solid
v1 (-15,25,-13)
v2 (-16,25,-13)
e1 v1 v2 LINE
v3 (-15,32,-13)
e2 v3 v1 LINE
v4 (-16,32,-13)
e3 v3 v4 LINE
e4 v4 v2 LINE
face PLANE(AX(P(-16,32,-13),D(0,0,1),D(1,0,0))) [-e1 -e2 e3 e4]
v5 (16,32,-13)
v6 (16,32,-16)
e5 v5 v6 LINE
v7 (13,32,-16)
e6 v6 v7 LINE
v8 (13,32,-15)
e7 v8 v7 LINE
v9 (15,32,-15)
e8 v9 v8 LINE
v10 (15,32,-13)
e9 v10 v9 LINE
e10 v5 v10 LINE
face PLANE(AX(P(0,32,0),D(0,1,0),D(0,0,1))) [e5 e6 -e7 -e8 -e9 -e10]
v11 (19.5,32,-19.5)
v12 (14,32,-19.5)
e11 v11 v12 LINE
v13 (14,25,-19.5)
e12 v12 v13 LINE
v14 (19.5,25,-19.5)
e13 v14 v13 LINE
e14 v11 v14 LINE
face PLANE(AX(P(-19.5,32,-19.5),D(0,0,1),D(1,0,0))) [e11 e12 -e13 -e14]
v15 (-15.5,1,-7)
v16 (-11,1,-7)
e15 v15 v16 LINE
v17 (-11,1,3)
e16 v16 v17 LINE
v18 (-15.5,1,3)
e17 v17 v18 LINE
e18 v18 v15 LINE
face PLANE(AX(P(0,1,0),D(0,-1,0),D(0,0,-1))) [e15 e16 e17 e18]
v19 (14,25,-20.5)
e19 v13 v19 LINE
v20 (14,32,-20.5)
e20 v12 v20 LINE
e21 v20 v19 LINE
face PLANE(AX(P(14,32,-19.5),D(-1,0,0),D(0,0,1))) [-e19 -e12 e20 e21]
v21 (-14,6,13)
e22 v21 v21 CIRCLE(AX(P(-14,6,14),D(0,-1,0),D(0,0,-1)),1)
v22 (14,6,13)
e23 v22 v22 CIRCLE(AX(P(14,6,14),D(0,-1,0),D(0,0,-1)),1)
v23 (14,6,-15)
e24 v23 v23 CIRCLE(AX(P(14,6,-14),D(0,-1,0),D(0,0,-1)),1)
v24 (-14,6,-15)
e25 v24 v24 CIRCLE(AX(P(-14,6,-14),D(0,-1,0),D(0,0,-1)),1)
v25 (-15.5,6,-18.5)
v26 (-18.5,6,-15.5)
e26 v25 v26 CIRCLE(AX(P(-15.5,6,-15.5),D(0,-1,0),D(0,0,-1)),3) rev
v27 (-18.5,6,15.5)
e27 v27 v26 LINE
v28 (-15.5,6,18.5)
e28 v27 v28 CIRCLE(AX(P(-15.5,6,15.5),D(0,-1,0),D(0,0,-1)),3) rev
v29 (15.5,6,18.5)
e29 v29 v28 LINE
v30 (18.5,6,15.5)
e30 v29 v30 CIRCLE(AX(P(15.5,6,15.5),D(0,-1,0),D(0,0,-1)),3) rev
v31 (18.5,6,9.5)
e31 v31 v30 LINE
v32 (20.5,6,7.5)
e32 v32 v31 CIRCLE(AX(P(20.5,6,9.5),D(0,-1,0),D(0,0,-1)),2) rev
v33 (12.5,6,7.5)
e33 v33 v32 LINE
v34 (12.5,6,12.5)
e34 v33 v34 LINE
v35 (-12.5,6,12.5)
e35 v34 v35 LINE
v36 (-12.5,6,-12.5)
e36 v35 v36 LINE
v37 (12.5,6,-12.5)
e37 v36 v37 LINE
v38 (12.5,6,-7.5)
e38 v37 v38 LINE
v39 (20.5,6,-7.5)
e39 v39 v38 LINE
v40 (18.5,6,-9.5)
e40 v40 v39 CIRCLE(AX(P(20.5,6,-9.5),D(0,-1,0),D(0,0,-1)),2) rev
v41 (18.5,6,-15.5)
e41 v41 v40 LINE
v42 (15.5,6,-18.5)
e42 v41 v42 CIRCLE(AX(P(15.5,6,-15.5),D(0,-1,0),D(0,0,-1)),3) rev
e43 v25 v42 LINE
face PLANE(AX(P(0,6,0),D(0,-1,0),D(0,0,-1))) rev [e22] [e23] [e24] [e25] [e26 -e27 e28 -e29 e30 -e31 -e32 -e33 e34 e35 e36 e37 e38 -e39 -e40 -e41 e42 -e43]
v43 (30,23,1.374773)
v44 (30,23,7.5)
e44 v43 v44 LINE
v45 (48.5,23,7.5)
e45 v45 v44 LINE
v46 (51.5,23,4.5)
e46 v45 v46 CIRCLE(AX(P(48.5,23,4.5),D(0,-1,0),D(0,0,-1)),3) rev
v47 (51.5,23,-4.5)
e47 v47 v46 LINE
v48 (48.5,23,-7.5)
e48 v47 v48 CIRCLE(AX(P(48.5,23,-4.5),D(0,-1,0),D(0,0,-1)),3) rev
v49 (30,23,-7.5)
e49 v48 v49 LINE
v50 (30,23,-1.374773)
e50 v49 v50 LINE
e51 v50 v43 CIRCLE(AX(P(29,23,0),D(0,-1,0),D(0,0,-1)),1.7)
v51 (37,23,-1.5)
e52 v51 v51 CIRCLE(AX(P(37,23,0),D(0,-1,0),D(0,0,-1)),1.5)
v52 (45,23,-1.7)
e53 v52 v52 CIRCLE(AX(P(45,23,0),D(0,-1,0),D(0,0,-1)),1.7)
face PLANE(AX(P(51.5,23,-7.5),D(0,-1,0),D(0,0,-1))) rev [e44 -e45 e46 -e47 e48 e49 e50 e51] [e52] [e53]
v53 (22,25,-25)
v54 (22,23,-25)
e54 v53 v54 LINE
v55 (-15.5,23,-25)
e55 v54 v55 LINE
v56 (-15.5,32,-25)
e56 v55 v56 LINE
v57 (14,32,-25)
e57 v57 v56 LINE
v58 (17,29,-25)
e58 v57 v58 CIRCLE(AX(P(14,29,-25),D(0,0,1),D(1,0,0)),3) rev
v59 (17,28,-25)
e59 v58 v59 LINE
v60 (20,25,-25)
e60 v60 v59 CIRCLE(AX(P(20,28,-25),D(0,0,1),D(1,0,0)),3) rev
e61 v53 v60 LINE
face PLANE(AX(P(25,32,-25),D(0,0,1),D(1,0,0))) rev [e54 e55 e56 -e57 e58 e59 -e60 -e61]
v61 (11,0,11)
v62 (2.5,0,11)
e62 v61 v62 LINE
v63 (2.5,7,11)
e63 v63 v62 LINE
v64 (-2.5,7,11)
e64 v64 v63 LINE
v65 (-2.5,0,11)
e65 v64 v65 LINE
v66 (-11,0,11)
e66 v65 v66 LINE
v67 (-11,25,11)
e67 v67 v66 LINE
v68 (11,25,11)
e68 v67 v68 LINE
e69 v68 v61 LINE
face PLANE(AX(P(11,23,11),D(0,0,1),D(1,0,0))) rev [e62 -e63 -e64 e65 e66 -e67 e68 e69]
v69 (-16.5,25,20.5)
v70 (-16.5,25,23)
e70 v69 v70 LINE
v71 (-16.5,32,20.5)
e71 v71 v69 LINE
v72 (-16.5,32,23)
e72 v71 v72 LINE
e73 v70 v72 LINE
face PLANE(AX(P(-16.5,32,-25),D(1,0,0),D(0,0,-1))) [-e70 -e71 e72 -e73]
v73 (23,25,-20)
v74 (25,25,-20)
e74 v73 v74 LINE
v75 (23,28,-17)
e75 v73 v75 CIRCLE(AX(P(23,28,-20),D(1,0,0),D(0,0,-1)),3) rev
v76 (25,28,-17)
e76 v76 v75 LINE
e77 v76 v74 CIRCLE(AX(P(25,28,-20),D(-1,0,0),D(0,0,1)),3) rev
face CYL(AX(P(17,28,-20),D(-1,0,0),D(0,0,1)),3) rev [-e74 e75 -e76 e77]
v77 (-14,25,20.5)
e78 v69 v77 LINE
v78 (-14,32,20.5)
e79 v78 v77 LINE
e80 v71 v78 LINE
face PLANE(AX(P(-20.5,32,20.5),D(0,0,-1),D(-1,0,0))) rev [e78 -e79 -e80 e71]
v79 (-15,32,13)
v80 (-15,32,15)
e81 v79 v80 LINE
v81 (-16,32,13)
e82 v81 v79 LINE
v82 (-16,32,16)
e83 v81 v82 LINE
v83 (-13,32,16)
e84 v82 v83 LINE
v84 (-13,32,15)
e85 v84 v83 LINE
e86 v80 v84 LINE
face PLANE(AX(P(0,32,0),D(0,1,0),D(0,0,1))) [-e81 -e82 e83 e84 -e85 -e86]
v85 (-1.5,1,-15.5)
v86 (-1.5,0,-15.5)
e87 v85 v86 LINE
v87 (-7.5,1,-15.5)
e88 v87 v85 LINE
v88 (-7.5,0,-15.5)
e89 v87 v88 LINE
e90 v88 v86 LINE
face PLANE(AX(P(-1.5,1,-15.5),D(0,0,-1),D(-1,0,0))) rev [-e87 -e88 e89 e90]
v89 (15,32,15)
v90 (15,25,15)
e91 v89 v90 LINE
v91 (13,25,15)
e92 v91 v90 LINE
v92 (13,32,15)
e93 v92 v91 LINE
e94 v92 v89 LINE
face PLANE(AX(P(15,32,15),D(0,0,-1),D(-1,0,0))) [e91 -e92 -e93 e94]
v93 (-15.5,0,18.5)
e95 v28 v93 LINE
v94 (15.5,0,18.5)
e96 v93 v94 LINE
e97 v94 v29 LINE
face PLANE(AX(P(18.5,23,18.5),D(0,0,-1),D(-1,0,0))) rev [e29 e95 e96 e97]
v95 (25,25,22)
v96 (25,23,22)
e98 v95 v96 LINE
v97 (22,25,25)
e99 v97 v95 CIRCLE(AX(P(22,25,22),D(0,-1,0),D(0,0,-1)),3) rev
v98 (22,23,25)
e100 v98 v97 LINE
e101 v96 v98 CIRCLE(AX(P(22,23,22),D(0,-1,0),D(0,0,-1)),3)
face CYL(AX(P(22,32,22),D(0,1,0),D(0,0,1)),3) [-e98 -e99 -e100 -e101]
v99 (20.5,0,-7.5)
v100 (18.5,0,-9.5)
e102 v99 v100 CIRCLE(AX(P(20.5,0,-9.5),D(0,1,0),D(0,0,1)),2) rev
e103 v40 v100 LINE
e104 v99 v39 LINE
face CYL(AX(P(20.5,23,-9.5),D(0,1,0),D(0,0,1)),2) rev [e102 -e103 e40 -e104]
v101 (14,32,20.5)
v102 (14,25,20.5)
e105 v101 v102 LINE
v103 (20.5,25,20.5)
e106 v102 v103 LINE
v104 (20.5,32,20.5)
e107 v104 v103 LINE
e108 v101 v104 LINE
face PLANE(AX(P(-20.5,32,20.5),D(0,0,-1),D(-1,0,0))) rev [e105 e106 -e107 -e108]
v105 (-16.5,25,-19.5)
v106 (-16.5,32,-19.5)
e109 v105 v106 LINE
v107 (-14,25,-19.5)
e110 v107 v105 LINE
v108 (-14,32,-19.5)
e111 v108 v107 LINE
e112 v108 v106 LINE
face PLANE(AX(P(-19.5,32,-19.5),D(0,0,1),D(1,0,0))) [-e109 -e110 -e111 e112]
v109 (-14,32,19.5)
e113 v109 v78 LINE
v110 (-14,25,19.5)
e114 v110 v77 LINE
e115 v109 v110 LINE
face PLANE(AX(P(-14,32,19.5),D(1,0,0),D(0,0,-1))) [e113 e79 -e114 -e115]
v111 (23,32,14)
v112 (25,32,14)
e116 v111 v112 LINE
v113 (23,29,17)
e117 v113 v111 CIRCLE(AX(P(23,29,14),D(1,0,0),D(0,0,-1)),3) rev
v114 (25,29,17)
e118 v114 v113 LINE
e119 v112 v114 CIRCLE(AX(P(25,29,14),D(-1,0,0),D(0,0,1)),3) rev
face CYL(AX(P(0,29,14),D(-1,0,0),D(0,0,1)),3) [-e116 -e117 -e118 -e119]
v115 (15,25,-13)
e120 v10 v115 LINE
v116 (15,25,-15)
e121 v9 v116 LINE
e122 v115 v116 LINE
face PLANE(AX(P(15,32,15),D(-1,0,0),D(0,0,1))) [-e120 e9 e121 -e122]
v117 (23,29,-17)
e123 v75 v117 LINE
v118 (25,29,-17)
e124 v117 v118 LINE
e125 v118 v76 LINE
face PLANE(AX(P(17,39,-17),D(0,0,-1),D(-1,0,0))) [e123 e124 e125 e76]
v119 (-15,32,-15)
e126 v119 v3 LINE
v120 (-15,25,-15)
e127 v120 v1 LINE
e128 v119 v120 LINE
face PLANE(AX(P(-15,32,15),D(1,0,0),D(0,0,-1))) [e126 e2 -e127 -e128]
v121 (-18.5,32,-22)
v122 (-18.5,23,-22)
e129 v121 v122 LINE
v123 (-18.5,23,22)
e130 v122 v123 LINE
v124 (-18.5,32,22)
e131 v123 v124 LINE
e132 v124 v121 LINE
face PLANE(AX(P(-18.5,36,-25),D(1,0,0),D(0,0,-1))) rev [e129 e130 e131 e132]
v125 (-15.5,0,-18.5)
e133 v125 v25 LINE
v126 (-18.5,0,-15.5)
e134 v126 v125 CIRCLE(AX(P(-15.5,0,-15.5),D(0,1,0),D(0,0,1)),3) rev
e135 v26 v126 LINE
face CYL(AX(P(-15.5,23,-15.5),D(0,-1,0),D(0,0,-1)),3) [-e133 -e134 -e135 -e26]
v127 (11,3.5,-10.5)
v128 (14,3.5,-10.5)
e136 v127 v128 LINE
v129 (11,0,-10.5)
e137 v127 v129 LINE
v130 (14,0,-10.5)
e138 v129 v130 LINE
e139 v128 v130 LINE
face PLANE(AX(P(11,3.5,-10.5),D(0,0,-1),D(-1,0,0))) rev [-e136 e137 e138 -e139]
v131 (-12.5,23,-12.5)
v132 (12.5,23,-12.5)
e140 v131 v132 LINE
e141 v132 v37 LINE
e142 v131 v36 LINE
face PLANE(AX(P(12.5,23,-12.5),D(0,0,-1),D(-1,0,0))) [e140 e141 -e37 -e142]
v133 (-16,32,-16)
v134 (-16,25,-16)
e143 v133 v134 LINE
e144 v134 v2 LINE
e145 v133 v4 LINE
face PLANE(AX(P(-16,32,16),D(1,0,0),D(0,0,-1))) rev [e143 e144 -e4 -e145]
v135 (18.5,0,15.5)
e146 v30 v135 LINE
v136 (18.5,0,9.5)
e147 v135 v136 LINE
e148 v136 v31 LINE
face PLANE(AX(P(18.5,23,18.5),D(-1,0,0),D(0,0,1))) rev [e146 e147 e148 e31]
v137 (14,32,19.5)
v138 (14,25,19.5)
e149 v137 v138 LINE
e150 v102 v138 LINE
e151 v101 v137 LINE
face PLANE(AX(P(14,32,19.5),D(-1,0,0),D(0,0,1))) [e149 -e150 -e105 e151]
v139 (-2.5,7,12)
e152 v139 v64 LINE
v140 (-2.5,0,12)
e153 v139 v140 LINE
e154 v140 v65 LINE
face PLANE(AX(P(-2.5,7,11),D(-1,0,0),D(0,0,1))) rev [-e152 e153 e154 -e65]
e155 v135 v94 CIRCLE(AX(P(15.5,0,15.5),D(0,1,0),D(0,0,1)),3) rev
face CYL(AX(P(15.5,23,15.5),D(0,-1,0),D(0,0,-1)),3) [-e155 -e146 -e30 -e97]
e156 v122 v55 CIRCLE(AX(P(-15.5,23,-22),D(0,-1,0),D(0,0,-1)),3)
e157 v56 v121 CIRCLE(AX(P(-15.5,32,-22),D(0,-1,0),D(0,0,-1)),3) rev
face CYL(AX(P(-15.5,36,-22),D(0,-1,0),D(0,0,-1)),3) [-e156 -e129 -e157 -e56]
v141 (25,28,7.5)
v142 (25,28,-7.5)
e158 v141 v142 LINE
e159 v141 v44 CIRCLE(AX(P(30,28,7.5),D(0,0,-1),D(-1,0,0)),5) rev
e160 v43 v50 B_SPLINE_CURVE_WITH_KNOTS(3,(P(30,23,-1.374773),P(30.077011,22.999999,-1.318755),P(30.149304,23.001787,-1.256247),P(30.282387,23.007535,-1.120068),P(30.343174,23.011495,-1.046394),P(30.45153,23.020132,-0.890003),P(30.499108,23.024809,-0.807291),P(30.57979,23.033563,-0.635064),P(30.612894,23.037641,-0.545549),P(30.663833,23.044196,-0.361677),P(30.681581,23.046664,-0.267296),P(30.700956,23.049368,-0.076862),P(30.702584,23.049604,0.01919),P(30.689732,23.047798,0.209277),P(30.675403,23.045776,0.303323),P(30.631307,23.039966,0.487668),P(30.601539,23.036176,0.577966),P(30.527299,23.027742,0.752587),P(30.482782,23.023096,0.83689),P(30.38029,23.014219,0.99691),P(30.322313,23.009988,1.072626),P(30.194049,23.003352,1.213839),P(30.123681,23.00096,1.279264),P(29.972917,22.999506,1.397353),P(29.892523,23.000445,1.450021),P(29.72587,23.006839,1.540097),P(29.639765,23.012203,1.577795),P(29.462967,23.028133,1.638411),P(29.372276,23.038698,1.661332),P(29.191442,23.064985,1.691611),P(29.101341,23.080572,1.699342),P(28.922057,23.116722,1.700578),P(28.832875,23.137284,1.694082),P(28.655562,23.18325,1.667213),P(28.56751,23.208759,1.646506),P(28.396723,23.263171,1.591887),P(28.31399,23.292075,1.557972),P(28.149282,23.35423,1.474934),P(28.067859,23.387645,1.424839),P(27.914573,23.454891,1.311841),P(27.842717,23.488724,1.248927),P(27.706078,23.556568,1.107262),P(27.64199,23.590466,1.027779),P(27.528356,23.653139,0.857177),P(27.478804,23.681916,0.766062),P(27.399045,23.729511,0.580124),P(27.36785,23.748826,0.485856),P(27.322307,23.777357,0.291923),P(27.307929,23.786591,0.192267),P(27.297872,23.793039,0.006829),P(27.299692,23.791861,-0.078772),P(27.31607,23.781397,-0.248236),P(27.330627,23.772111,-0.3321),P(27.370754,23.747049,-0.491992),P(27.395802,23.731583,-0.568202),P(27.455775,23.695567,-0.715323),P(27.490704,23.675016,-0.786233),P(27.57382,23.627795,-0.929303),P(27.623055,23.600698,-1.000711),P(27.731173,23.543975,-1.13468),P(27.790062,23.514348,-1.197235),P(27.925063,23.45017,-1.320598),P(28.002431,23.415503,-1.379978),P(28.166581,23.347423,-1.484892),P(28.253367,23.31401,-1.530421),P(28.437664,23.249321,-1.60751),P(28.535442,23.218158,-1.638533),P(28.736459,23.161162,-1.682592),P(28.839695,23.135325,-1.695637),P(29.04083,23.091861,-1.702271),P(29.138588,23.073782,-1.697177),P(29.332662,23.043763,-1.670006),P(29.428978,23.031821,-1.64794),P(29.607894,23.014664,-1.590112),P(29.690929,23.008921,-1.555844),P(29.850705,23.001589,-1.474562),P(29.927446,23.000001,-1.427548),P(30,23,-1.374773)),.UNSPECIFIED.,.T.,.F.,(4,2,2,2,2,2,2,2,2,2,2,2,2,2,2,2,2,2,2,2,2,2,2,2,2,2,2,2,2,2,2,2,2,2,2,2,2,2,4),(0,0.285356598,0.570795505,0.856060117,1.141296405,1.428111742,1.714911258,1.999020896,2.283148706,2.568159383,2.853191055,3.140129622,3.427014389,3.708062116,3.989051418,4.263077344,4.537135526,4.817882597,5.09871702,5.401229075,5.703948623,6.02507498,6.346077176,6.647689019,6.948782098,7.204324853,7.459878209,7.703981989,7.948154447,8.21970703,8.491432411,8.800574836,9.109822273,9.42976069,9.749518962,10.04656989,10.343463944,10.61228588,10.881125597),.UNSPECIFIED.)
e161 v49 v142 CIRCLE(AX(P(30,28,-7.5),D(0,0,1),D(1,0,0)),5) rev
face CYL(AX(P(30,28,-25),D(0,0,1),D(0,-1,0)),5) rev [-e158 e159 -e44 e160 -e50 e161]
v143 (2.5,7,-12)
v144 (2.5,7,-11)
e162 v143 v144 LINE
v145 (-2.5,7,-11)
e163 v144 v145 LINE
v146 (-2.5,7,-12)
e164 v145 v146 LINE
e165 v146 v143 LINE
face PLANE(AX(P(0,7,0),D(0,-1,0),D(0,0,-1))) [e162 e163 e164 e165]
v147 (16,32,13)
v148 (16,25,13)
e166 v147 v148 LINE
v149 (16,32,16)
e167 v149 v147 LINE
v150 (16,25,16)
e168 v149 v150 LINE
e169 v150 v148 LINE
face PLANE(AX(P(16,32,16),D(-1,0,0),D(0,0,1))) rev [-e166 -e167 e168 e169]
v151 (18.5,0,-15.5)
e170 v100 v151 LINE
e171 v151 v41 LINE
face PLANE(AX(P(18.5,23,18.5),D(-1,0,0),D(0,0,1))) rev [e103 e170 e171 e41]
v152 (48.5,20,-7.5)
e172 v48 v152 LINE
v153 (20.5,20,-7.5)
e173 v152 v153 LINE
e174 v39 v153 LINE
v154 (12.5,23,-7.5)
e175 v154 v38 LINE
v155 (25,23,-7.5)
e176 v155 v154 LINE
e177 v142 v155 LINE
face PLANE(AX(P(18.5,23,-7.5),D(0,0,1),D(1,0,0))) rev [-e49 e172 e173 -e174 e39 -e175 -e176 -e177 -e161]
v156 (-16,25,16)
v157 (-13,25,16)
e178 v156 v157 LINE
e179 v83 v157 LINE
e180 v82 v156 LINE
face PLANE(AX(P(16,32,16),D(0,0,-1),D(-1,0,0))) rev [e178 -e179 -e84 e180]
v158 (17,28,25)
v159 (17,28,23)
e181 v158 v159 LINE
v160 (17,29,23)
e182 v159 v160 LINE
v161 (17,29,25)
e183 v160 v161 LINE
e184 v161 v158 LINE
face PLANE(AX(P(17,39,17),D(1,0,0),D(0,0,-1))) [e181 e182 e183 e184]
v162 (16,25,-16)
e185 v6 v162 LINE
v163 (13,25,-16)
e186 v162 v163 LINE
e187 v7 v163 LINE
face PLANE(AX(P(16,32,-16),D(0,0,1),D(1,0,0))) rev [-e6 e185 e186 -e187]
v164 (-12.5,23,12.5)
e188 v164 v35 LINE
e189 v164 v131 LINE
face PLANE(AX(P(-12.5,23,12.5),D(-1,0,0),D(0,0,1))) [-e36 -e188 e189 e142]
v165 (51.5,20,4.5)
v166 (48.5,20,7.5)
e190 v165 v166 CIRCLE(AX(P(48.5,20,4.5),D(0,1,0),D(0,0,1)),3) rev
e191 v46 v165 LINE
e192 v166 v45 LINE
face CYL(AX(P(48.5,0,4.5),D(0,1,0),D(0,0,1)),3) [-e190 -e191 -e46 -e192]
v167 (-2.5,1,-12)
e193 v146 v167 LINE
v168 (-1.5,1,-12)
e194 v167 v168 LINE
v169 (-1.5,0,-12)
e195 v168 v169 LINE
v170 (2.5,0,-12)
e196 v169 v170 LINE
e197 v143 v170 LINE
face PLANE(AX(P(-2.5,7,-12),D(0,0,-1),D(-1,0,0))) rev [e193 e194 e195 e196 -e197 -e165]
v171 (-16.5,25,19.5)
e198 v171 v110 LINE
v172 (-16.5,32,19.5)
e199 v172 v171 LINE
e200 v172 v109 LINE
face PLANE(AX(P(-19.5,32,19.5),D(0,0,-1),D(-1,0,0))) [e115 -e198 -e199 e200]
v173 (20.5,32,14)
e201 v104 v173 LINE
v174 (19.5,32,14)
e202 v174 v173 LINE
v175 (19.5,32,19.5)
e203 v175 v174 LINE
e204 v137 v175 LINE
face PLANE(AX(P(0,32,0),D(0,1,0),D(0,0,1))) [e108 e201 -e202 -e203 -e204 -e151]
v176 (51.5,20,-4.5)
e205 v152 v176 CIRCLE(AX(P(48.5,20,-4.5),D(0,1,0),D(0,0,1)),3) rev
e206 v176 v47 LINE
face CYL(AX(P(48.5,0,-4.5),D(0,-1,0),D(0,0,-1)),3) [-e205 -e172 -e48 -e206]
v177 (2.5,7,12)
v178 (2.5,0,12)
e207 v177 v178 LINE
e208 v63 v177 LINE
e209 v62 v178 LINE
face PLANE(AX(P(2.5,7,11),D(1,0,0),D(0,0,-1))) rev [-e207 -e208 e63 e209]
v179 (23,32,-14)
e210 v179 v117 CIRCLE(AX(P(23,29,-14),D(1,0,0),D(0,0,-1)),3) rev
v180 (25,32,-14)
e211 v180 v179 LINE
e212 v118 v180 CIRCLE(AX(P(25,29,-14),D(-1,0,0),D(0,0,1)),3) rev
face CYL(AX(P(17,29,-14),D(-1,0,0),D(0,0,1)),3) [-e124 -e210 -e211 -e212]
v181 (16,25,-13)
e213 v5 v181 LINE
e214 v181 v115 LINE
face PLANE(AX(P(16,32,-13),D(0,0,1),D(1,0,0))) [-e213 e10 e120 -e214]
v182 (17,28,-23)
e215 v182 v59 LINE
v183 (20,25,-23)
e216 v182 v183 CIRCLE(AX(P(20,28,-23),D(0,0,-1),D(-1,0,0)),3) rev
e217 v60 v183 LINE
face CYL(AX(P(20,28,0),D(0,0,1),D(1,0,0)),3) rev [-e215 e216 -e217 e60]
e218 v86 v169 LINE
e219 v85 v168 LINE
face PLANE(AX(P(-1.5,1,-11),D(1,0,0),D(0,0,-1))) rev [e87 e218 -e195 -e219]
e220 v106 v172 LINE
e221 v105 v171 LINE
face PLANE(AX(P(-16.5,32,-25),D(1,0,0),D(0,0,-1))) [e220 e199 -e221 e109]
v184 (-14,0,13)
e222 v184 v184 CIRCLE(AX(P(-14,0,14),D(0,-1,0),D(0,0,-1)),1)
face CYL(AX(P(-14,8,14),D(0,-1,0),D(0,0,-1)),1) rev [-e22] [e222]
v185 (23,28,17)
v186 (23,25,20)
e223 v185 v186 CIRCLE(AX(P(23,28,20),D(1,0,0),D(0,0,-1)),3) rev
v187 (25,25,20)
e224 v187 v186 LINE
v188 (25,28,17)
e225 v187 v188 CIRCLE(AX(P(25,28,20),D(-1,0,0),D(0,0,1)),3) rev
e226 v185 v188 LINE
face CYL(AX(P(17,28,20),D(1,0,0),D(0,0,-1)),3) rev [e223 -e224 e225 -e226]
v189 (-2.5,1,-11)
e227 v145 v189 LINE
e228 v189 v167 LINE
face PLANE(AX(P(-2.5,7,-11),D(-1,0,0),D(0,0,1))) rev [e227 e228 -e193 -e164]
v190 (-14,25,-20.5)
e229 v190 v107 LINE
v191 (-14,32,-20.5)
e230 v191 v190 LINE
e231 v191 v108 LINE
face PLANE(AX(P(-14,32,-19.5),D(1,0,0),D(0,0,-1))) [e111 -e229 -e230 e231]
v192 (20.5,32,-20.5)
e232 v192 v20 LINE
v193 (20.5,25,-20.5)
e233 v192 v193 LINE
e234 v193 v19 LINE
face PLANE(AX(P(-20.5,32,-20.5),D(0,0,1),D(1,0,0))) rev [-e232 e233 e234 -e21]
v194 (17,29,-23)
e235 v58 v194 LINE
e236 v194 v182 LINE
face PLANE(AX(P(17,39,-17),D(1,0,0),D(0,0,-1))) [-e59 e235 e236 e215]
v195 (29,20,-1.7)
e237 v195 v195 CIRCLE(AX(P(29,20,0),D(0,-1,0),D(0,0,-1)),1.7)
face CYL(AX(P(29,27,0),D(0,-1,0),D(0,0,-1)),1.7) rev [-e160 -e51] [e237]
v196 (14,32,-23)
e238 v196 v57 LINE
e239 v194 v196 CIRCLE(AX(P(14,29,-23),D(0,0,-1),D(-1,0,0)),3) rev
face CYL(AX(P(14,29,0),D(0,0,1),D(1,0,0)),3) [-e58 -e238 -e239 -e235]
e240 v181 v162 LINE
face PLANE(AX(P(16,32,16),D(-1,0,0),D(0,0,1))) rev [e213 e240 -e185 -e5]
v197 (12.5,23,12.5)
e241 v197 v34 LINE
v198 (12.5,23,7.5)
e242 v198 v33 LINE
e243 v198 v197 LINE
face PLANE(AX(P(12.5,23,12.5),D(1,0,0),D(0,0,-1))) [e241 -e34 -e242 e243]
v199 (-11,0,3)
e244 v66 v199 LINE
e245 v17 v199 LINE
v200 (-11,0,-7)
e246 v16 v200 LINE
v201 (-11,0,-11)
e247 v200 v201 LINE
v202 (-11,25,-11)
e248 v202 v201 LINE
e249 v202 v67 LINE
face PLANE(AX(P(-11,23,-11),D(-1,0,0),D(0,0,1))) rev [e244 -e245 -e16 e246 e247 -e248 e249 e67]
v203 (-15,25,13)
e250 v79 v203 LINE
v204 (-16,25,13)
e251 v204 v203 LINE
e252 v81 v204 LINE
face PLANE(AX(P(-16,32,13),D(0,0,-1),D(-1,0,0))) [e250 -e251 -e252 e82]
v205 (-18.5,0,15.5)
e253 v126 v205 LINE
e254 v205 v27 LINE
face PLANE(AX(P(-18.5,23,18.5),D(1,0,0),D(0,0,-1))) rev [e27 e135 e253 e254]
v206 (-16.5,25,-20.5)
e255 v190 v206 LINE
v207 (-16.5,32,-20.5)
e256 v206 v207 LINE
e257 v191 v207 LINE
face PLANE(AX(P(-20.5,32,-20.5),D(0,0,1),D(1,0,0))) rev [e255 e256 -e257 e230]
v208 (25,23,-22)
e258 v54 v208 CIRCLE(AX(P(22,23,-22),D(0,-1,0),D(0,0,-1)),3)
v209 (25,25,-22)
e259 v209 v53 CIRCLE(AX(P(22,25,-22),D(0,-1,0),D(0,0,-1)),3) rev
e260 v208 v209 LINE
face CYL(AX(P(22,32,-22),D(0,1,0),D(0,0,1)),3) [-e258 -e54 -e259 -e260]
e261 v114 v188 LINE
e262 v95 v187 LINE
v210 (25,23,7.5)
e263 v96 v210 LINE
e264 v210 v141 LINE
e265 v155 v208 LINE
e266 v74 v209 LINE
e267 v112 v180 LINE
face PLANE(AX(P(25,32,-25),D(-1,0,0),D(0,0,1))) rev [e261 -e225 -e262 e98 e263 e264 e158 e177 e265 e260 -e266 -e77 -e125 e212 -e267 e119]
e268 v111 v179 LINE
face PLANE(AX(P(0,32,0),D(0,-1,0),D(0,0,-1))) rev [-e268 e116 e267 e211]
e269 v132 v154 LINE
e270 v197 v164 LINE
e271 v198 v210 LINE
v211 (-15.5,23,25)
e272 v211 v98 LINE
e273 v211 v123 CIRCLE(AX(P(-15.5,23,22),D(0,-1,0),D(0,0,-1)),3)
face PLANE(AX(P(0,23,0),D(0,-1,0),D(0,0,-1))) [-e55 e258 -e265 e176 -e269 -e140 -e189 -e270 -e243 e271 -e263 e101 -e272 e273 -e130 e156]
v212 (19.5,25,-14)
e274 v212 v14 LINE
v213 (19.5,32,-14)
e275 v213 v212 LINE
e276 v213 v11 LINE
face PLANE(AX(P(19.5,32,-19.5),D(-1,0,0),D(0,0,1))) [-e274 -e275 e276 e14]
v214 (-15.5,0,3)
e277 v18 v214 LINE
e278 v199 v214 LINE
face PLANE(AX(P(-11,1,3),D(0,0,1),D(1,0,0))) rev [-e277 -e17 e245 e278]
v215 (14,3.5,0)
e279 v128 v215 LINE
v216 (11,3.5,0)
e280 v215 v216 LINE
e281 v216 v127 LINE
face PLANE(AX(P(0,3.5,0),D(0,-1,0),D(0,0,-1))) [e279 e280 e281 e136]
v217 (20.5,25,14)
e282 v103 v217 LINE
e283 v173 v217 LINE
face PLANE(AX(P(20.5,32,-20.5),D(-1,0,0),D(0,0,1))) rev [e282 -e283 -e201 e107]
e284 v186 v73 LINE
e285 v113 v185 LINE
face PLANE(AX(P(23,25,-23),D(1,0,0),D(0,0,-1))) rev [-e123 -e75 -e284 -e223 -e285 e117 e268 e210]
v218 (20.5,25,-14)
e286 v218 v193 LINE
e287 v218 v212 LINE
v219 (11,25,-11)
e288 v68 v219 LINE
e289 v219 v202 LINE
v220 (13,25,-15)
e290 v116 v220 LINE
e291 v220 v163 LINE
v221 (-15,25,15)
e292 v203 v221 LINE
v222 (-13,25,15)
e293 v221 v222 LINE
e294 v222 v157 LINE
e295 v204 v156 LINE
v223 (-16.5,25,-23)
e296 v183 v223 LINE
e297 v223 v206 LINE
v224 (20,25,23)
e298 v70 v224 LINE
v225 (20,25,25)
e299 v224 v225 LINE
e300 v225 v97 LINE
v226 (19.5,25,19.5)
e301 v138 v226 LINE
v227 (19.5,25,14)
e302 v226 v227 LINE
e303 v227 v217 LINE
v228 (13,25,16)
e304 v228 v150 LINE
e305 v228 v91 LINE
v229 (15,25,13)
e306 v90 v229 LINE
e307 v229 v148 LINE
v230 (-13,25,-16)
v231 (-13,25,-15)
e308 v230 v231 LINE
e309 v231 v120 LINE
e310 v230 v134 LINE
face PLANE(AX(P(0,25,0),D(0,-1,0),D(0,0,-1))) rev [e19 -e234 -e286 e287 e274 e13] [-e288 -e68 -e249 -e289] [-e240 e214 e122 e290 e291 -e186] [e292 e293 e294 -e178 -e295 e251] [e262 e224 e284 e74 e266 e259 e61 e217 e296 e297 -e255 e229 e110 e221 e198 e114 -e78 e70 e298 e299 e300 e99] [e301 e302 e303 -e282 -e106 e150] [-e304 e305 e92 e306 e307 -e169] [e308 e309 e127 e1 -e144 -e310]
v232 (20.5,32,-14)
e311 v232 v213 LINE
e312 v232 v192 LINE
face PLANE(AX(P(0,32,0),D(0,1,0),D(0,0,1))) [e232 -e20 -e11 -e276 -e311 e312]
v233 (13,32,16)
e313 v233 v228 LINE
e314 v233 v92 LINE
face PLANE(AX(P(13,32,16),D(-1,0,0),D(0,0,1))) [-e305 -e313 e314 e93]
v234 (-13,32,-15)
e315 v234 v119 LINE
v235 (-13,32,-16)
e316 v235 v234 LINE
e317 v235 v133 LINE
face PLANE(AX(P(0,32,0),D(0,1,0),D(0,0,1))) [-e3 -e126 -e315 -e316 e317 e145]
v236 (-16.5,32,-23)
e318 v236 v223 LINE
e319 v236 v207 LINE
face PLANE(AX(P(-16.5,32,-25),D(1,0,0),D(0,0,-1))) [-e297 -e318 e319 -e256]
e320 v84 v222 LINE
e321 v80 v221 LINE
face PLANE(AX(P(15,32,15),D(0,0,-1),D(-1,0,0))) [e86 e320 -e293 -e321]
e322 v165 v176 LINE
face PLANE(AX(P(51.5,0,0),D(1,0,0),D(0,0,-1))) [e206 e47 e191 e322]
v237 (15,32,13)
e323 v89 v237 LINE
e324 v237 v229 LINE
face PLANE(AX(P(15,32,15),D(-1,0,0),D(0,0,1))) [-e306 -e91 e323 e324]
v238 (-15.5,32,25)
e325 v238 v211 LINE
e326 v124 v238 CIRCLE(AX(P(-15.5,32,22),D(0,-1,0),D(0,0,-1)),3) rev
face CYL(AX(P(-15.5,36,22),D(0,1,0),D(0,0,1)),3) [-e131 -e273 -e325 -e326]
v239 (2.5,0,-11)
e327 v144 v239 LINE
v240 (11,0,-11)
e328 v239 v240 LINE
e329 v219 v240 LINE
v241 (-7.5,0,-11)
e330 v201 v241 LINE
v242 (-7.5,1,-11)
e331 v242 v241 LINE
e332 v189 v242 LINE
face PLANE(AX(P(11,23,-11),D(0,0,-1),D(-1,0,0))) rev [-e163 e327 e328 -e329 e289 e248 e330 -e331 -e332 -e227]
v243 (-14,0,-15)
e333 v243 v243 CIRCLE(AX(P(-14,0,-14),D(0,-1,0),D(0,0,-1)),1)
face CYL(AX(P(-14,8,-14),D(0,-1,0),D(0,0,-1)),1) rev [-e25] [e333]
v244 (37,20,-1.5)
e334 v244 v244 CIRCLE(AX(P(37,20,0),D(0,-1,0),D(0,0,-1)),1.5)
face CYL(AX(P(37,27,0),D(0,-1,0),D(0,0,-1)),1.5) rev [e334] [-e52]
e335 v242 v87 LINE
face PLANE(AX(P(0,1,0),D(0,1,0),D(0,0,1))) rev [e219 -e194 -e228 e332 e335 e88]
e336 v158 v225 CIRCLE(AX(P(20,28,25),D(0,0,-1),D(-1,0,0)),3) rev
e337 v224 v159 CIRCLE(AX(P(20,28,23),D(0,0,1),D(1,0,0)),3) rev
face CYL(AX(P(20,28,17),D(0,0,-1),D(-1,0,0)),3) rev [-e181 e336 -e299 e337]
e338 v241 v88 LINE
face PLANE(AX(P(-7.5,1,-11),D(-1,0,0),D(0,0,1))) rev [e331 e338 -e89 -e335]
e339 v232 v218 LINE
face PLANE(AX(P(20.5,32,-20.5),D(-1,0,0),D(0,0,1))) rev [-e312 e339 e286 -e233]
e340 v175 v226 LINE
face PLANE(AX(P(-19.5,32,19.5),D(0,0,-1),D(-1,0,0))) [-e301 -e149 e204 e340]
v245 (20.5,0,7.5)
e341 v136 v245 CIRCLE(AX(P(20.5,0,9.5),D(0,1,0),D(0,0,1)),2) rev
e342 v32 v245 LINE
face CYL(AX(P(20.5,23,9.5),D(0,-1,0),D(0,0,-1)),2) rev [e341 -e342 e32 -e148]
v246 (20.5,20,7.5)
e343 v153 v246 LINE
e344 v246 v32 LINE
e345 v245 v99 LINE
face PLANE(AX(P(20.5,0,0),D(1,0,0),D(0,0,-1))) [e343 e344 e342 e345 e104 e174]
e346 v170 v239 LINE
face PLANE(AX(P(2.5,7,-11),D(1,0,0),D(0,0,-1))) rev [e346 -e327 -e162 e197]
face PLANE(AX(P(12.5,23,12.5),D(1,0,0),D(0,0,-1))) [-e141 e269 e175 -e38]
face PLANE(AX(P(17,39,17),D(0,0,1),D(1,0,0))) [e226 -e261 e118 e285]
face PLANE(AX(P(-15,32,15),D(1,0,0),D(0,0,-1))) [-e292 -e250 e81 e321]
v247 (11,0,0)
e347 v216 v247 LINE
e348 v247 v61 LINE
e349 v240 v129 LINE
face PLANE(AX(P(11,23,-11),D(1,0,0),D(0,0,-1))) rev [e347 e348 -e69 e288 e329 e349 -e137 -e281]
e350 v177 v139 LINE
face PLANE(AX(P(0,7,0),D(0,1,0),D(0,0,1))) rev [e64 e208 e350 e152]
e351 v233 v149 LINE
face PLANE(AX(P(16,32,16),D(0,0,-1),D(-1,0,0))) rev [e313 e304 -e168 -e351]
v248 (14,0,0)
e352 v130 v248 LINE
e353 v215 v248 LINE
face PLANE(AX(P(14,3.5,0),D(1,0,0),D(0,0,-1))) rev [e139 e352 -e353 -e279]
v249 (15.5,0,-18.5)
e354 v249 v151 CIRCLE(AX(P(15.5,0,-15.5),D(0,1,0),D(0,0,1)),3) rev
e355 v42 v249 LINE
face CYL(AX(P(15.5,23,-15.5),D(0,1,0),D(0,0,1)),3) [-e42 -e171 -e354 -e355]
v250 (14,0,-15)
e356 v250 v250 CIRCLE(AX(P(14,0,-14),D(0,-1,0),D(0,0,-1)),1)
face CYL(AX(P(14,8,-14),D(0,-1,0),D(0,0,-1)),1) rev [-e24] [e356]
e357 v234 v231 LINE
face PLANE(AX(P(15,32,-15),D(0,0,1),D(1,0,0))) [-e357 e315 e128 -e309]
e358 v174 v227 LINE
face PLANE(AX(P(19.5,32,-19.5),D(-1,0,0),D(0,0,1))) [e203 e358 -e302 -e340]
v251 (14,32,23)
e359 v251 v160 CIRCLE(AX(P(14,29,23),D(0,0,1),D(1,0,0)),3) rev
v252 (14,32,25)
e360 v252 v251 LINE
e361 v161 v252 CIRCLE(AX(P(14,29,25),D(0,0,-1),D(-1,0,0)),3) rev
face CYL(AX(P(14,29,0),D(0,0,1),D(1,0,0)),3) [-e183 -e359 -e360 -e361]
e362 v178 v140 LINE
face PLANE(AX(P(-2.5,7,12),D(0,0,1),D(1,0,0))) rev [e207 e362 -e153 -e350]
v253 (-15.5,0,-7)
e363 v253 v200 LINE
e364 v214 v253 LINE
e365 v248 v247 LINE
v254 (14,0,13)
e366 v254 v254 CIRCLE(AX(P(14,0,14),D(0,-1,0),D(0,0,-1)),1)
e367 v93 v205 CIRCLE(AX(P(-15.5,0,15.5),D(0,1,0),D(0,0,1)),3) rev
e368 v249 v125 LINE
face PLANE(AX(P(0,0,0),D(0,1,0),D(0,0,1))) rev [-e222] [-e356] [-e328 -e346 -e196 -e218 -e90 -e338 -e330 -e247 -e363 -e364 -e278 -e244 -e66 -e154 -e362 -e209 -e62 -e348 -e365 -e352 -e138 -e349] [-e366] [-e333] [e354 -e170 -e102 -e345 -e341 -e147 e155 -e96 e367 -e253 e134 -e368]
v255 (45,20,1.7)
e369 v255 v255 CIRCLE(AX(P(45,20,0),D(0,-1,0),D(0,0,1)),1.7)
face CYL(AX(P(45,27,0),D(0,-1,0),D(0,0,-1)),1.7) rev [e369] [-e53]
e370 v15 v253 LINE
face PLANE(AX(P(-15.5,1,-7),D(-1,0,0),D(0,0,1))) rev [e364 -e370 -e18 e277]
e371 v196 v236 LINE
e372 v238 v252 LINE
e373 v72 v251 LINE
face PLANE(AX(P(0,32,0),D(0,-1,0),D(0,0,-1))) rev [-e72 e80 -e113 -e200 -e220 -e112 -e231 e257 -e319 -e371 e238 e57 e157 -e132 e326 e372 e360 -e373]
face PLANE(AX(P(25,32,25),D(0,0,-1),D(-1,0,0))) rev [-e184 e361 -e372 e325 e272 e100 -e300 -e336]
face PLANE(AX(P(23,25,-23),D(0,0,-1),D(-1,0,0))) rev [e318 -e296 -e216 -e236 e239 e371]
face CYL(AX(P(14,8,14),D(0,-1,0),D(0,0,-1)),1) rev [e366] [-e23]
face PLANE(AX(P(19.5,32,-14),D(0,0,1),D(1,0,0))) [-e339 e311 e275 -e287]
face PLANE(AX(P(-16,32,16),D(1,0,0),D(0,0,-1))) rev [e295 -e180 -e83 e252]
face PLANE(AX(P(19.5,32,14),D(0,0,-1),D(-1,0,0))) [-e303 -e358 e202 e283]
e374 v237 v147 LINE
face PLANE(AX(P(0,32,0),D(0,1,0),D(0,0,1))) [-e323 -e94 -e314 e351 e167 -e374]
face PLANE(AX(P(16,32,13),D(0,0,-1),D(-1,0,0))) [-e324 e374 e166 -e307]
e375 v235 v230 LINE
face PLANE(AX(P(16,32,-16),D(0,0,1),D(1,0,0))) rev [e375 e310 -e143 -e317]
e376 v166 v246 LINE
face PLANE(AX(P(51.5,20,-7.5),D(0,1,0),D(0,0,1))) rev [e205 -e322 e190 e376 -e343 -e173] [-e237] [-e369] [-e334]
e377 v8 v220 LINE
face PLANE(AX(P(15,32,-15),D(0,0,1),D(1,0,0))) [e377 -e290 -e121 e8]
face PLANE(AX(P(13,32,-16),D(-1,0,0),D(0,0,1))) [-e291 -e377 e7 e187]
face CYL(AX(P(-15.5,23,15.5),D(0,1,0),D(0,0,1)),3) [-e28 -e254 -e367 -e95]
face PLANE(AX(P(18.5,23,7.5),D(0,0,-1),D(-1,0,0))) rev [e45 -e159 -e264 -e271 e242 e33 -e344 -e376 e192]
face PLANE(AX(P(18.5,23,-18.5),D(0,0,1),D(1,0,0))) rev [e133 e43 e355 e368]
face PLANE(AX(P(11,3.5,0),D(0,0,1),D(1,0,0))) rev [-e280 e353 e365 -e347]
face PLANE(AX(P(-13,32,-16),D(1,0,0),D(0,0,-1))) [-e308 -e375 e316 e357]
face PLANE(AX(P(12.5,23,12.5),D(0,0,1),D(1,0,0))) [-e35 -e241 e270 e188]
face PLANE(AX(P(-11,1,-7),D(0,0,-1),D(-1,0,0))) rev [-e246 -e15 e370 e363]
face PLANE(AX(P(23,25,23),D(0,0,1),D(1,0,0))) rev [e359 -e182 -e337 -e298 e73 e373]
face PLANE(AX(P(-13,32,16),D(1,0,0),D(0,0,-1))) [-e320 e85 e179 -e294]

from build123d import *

# Parameters (mm, degrees)
SKETCH_2_W            = 37
SKETCH_2_H            = 37
EXTRUDE_1_DEPTH       = 23
SKETCH_3_W            = 22
SKETCH_3_H            = 22
CUT_EXTRUDE_1_DEPTH   = 23
SKETCH_19_OUTSIDE_W   = 50.432
SKETCH_19_OUTSIDE_H   = 50.432
SKETCH_19_OUTSIDE_W_2 = 25
SKETCH_19_OUTSIDE_H_2 = 25
CUT_EXTRUDE_17_DEPTH  = 17
SKETCH_4_W            = 50
SKETCH_4_H            = 50
EXTRUDE_2_DEPTH       = 9
SKETCH_5_W            = 46
SKETCH_5_H            = 46
CUT_EXTRUDE_3_DEPTH   = 7
SKETCH_12_W           = 8
SKETCH_12_H           = 8
CUT_EXTRUDE_14_DEPTH  = 14
SKETCH_6_W            = 22
SKETCH_6_H            = 22
CUT_EXTRUDE_4_DEPTH   = 2
SKETCH_11_R           = 1
CUT_EXTRUDE_7_DEPTH   = 8
SKETCH_13_W           = 41
SKETCH_13_H           = 41
SKETCH_13_W_2         = 39
SKETCH_13_H_2         = 39
EXTRUDE_3_DEPTH       = 7
SKETCH_17_W           = 32
SKETCH_17_H           = 32
SKETCH_17_W_2         = 30
SKETCH_17_H_2         = 30
EXTRUDE_4_DEPTH       = 7
SKETCH_15_W           = 28
SKETCH_15_H           = 1
SKETCH_15_W_2         = 1
SKETCH_15_H_2         = 28
CUT_EXTRUDE_15_DEPTH  = 7
SKETCH_18_W           = 1
SKETCH_18_H           = 26
SKETCH_18_W_2         = 26
SKETCH_18_H_2         = 1
CUT_EXTRUDE_16_DEPTH  = 7
SKETCH_20_W           = 3
SKETCH_20_H           = 10.5
CUT_EXTRUDE_18_DEPTH  = 3.5
SKETCH_21_W           = 4.5
SKETCH_21_H           = 10
CUT_EXTRUDE_19_DEPTH  = 1
SKETCH_22_W           = 5
SKETCH_22_H           = 1
CUT_EXTRUDE_21_DEPTH  = 7
SKETCH_24_W           = 6
SKETCH_24_H           = 4.5
CUT_EXTRUDE_22_DEPTH  = 1
SKETCH_25_W           = 6
SKETCH_25_H           = 15
EXTRUDE_5_DEPTH       = 17
SKETCH_26_W           = 15
SKETCH_26_H           = 3
EXTRUDE_6_DEPTH       = 33
SKETCH_28_W           = 6.5
SKETCH_28_H           = 50
CUT_EXTRUDE_27_DEPTH  = 13
SKETCH_32_W           = 2
SKETCH_32_H           = 50
EXTRUDE_9_DEPTH       = 9
FILLET_5_R            = 3
FILLET_6_R            = 3
FILLET_7_R            = 3
FILLET_8_R            = 3
FILLET_9_R            = 3
FILLET_10_R           = 3
FILLET_11_R           = 3
FILLET_12_R           = 3
FILLET_13_R           = 3
FILLET_14_R           = 3
FILLET_15_R           = 3
FILLET_16_R           = 3
FILLET_17_R           = 5
FILLET_19_R           = 3
FILLET_20_R           = 3
FILLET_21_R           = 3
FILLET_22_R           = 3
SKETCH_34_W           = 15
SKETCH_34_H           = 20
EXTRUDE_10_DEPTH      = 2
SKETCH_33_R           = 1.7
SKETCH_33_R_2         = 1.5
CUT_EXTRUDE_28_DEPTH  = 7
FILLET_23_R           = 3
FILLET_24_R           = 3
FILLET_25_R           = 2
FILLET_26_R           = 2


with BuildPart() as part:
    # 草图2 → 凸台-拉伸1 (new body)
    with BuildSketch(Plane(origin=(0, 0, 0), x_dir=(1, 0, 0), z_dir=(0, 1, 0))):
        Rectangle(SKETCH_2_W, SKETCH_2_H)
    extrude(amount=EXTRUDE_1_DEPTH)

    # 草图3 → 切除-拉伸1 (cut)
    with BuildSketch(Plane.XZ):
        Rectangle(SKETCH_3_W, SKETCH_3_H)
    extrude(amount=-CUT_EXTRUDE_1_DEPTH, mode=Mode.SUBTRACT)

    # 草图19 outside → 切除-拉伸17 (cut)
    with BuildSketch(Plane(origin=(0, 6, 0), x_dir=(-1, 0, 0), z_dir=(0, -1, 0))):
        Rectangle(SKETCH_19_OUTSIDE_W, SKETCH_19_OUTSIDE_H)
        Rectangle(SKETCH_19_OUTSIDE_W_2, SKETCH_19_OUTSIDE_H_2, mode=Mode.SUBTRACT)
    extrude(amount=-CUT_EXTRUDE_17_DEPTH, mode=Mode.SUBTRACT)

    # 草图4 → 凸台-拉伸2 (add)
    with BuildSketch(Plane(origin=(0, 23, 0), x_dir=(1, 0, 0), z_dir=(0, 1, 0))):
        Rectangle(SKETCH_4_W, SKETCH_4_H)
    extrude(amount=EXTRUDE_2_DEPTH)

    # 草图5 → 切除-拉伸3 (cut)
    with BuildSketch(Plane(origin=(0, 32, 0), x_dir=(1, 0, 0), z_dir=(0, 1, 0))):
        Rectangle(SKETCH_5_W, SKETCH_5_H)
    extrude(amount=-CUT_EXTRUDE_3_DEPTH, mode=Mode.SUBTRACT)

    # 草图12 → 切除-拉伸14 (cut)
    with BuildSketch(Plane(origin=(0, 25, 0), x_dir=(1, 0, 0), z_dir=(0, 1, 0))):
        with Locations((-21, -21)):
            Rectangle(SKETCH_12_W, SKETCH_12_H)
        with Locations((-21, 21)):
            Rectangle(SKETCH_12_W, SKETCH_12_H)
        with Locations((21, 21)):
            Rectangle(SKETCH_12_W, SKETCH_12_H)
        with Locations((21, -21)):
            Rectangle(SKETCH_12_W, SKETCH_12_H)
    extrude(amount=CUT_EXTRUDE_14_DEPTH, mode=Mode.SUBTRACT)

    # 草图6 → 切除-拉伸4 (cut)
    with BuildSketch(Plane(origin=(0, 25, 0), x_dir=(1, 0, 0), z_dir=(0, 1, 0))):
        Rectangle(SKETCH_6_W, SKETCH_6_H)
    extrude(amount=-CUT_EXTRUDE_4_DEPTH, mode=Mode.SUBTRACT)

    # 草图11 → 切除-拉伸7 (cut)
    with BuildSketch(Plane.XZ):
        with Locations(Location((14, 14, 0), (0, 0, 270))):
            Circle(SKETCH_11_R)
        with Locations(Location((14, -14, 0), (0, 0, 270))):
            Circle(SKETCH_11_R)
        with Locations(Location((-14, -14, 0), (0, 0, 270))):
            Circle(SKETCH_11_R)
        with Locations(Location((-14, 14, 0), (0, 0, 270))):
            Circle(SKETCH_11_R)
    extrude(amount=-CUT_EXTRUDE_7_DEPTH, mode=Mode.SUBTRACT)

    # 草图13 → 凸台-拉伸3 (add)
    with BuildSketch(Plane(origin=(0, 25, 0), x_dir=(1, 0, 0), z_dir=(0, 1, 0))):
        Rectangle(SKETCH_13_W, SKETCH_13_H)
        Rectangle(SKETCH_13_W_2, SKETCH_13_H_2, mode=Mode.SUBTRACT)
    extrude(amount=EXTRUDE_3_DEPTH)

    # 草图17 → 凸台-拉伸4 (add)
    with BuildSketch(Plane(origin=(0, 25, 0), x_dir=(1, 0, 0), z_dir=(0, 1, 0))):
        Rectangle(SKETCH_17_W, SKETCH_17_H)
        Rectangle(SKETCH_17_W_2, SKETCH_17_H_2, mode=Mode.SUBTRACT)
    extrude(amount=EXTRUDE_4_DEPTH)

    # 草图15 → 切除-拉伸15 (cut)
    with BuildSketch(Plane(origin=(0, 25, 0), x_dir=(1, 0, 0), z_dir=(0, 1, 0))):
        with Locations((0, -20)):
            Rectangle(SKETCH_15_W, SKETCH_15_H)
        with Locations((20, 0)):
            Rectangle(SKETCH_15_W_2, SKETCH_15_H_2)
        with Locations((-20, 0)):
            Rectangle(SKETCH_15_W_2, SKETCH_15_H_2)
        with Locations((0, 20)):
            Rectangle(SKETCH_15_W, SKETCH_15_H)
    extrude(amount=CUT_EXTRUDE_15_DEPTH, mode=Mode.SUBTRACT)

    # 草图18 → 切除-拉伸16 (cut)
    with BuildSketch(Plane(origin=(0, 25, 0), x_dir=(1, 0, 0), z_dir=(0, 1, 0))):
        with Locations((15.5, 0)):
            Rectangle(SKETCH_18_W, SKETCH_18_H)
        with Locations((0, -15.5)):
            Rectangle(SKETCH_18_W_2, SKETCH_18_H_2)
        with Locations((-15.5, 0)):
            Rectangle(SKETCH_18_W, SKETCH_18_H)
        with Locations((0, 15.5)):
            Rectangle(SKETCH_18_W_2, SKETCH_18_H_2)
    extrude(amount=CUT_EXTRUDE_16_DEPTH, mode=Mode.SUBTRACT)

    # 草图20 → 切除-拉伸18 (cut)
    with BuildSketch(Plane.XZ):
        with Locations((12.5, -5.25)):
            Rectangle(SKETCH_20_W, SKETCH_20_H)
    extrude(amount=-CUT_EXTRUDE_18_DEPTH, mode=Mode.SUBTRACT)

    # 草图21 → 切除-拉伸19 (cut)
    with BuildSketch(Plane.XZ):
        with Locations((-13.25, -2)):
            Rectangle(SKETCH_21_W, SKETCH_21_H)
    extrude(amount=-CUT_EXTRUDE_19_DEPTH, mode=Mode.SUBTRACT)

    # 草图22 → 切除-拉伸21 (cut)
    with BuildSketch(Plane.XZ):
        with Locations((0, -11.5)):
            Rectangle(SKETCH_22_W, SKETCH_22_H)
        with Locations((0, 11.5)):
            Rectangle(SKETCH_22_W, SKETCH_22_H)
    extrude(amount=-CUT_EXTRUDE_21_DEPTH, mode=Mode.SUBTRACT)

    # 草图24 → 切除-拉伸22 (cut)
    with BuildSketch(Plane.XZ):
        with Locations((-4.5, -13.25)):
            Rectangle(SKETCH_24_W, SKETCH_24_H)
    extrude(amount=-CUT_EXTRUDE_22_DEPTH, mode=Mode.SUBTRACT)

    # 草图25 → 凸台-拉伸5 (add)
    with BuildSketch(Plane(origin=(0, 6, 0), x_dir=(1, 0, 0), z_dir=(0, 1, 0))):
        with Locations((15.5, 0)):
            Rectangle(SKETCH_25_W, SKETCH_25_H)
    extrude(amount=EXTRUDE_5_DEPTH)

    # 草图26 → 凸台-拉伸6 (add)
    with BuildSketch(Plane(origin=(18.5, 0, 0), x_dir=(0, 0, -1), z_dir=(1, 0, 0))):
        with Locations((0, 21.5)):
            Rectangle(SKETCH_26_W, SKETCH_26_H)
    extrude(amount=EXTRUDE_6_DEPTH)

    # 草图28 → 切除-拉伸27 (cut)
    with BuildSketch(Plane.XZ.offset(-23)):
        with Locations((-21.75, 0)):
            Rectangle(SKETCH_28_W, SKETCH_28_H)
    extrude(amount=-CUT_EXTRUDE_27_DEPTH, mode=Mode.SUBTRACT)

    # 草图32 → 凸台-拉伸9 (add)
    with BuildSketch(Plane.XZ.offset(-23)):
        with Locations((-17.5, 0)):
            Rectangle(SKETCH_32_W, SKETCH_32_H)
    extrude(amount=-EXTRUDE_9_DEPTH)

    # 圆角5
    fillet_5_edges = [part.edges().sort_by_distance(p)[0] for p in [
        (25, 24, -25),
    ]]
    fillet(fillet_5_edges, radius=FILLET_5_R)

    # 圆角6
    fillet_6_edges = [part.edges().sort_by_distance(p)[0] for p in [
        (25, 24, 25),
    ]]
    fillet(fillet_6_edges, radius=FILLET_6_R)

    # 圆角7
    fillet_7_edges = [part.edges().sort_by_distance(p)[0] for p in [
        (-18.5, 27.5, -25),
    ]]
    fillet(fillet_7_edges, radius=FILLET_7_R)

    # 圆角8
    fillet_8_edges = [part.edges().sort_by_distance(p)[0] for p in [
        (-18.5, 27.5, 25),
    ]]
    fillet(fillet_8_edges, radius=FILLET_8_R)

    # 圆角9
    fillet_9_edges = [part.edges().sort_by_distance(p)[0] for p in [
        (17, 32, -24),
    ]]
    fillet(fillet_9_edges, radius=FILLET_9_R)

    # 圆角10
    fillet_10_edges = [part.edges().sort_by_distance(p)[0] for p in [
        (17, 25, -24),
    ]]
    fillet(fillet_10_edges, radius=FILLET_10_R)

    # 圆角11
    fillet_11_edges = [part.edges().sort_by_distance(p)[0] for p in [
        (24, 32, -17),
    ]]
    fillet(fillet_11_edges, radius=FILLET_11_R)

    # 圆角12
    fillet_12_edges = [part.edges().sort_by_distance(p)[0] for p in [
        (24, 25, -17),
    ]]
    fillet(fillet_12_edges, radius=FILLET_12_R)

    # 圆角13
    fillet_13_edges = [part.edges().sort_by_distance(p)[0] for p in [
        (17, 32, 24),
    ]]
    fillet(fillet_13_edges, radius=FILLET_13_R)

    # 圆角14
    fillet_14_edges = [part.edges().sort_by_distance(p)[0] for p in [
        (17, 25, 24),
    ]]
    fillet(fillet_14_edges, radius=FILLET_14_R)

    # 圆角15
    fillet_15_edges = [part.edges().sort_by_distance(p)[0] for p in [
        (24, 32, 17),
    ]]
    fillet(fillet_15_edges, radius=FILLET_15_R)

    # 圆角16
    fillet_16_edges = [part.edges().sort_by_distance(p)[0] for p in [
        (24, 25, 17),
    ]]
    fillet(fillet_16_edges, radius=FILLET_16_R)

    # 圆角17
    fillet_17_edges = [part.edges().sort_by_distance(p)[0] for p in [
        (25, 23, 0),
    ]]
    fillet(fillet_17_edges, radius=FILLET_17_R)

    # 圆角19
    fillet_19_edges = [part.edges().sort_by_distance(p)[0] for p in [
        (-18.5, 3, -18.5),
    ]]
    fillet(fillet_19_edges, radius=FILLET_19_R)

    # 圆角20
    fillet_20_edges = [part.edges().sort_by_distance(p)[0] for p in [
        (-18.5, 3, 18.5),
    ]]
    fillet(fillet_20_edges, radius=FILLET_20_R)

    # 圆角21
    fillet_21_edges = [part.edges().sort_by_distance(p)[0] for p in [
        (18.5, 3, 18.5),
    ]]
    fillet(fillet_21_edges, radius=FILLET_21_R)

    # 圆角22
    fillet_22_edges = [part.edges().sort_by_distance(p)[0] for p in [
        (18.5, 3, -18.5),
    ]]
    fillet(fillet_22_edges, radius=FILLET_22_R)

    # 草图34 → 凸台-拉伸10 (add)
    with BuildSketch(Plane(origin=(18.5, 0, 0), x_dir=(0, 0, -1), z_dir=(1, 0, 0))):
        with Locations((0, 10)):
            Rectangle(SKETCH_34_W, SKETCH_34_H)
    extrude(amount=EXTRUDE_10_DEPTH)

    # 草图33 → 切除-拉伸28 (cut)
    with BuildSketch(Plane.XZ.offset(-20)):
        with Locations(Location((29, 0, 0), (0, 0, 270))):
            Circle(SKETCH_33_R)
        with Locations(Location((37, 0, 0), (0, 0, 270))):
            Circle(SKETCH_33_R_2)
        with Locations(Location((45, 0, 0), (0, 0, 270))):
            Circle(SKETCH_33_R)
    extrude(amount=-CUT_EXTRUDE_28_DEPTH, mode=Mode.SUBTRACT)

    # 圆角23
    fillet_23_edges = [part.edges().sort_by_distance(p)[0] for p in [
        (51.5, 21.5, 7.5),
    ]]
    fillet(fillet_23_edges, radius=FILLET_23_R)

    # 圆角24
    fillet_24_edges = [part.edges().sort_by_distance(p)[0] for p in [
        (51.5, 21.5, -7.5),
    ]]
    fillet(fillet_24_edges, radius=FILLET_24_R)

    # 圆角25
    fillet_25_edges = [part.edges().sort_by_distance(p)[0] for p in [
        (18.5, 3, 7.5),
    ]]
    fillet(fillet_25_edges, radius=FILLET_25_R - 0.0001)  # a hair under: the kernel refuses the full size

    # 圆角26
    fillet_26_edges = [part.edges().sort_by_distance(p)[0] for p in [
        (18.5, 3, -7.5),
    ]]
    fillet(fillet_26_edges, radius=FILLET_26_R - 0.0001)  # a hair under: the kernel refuses the full size


solid = part.part
